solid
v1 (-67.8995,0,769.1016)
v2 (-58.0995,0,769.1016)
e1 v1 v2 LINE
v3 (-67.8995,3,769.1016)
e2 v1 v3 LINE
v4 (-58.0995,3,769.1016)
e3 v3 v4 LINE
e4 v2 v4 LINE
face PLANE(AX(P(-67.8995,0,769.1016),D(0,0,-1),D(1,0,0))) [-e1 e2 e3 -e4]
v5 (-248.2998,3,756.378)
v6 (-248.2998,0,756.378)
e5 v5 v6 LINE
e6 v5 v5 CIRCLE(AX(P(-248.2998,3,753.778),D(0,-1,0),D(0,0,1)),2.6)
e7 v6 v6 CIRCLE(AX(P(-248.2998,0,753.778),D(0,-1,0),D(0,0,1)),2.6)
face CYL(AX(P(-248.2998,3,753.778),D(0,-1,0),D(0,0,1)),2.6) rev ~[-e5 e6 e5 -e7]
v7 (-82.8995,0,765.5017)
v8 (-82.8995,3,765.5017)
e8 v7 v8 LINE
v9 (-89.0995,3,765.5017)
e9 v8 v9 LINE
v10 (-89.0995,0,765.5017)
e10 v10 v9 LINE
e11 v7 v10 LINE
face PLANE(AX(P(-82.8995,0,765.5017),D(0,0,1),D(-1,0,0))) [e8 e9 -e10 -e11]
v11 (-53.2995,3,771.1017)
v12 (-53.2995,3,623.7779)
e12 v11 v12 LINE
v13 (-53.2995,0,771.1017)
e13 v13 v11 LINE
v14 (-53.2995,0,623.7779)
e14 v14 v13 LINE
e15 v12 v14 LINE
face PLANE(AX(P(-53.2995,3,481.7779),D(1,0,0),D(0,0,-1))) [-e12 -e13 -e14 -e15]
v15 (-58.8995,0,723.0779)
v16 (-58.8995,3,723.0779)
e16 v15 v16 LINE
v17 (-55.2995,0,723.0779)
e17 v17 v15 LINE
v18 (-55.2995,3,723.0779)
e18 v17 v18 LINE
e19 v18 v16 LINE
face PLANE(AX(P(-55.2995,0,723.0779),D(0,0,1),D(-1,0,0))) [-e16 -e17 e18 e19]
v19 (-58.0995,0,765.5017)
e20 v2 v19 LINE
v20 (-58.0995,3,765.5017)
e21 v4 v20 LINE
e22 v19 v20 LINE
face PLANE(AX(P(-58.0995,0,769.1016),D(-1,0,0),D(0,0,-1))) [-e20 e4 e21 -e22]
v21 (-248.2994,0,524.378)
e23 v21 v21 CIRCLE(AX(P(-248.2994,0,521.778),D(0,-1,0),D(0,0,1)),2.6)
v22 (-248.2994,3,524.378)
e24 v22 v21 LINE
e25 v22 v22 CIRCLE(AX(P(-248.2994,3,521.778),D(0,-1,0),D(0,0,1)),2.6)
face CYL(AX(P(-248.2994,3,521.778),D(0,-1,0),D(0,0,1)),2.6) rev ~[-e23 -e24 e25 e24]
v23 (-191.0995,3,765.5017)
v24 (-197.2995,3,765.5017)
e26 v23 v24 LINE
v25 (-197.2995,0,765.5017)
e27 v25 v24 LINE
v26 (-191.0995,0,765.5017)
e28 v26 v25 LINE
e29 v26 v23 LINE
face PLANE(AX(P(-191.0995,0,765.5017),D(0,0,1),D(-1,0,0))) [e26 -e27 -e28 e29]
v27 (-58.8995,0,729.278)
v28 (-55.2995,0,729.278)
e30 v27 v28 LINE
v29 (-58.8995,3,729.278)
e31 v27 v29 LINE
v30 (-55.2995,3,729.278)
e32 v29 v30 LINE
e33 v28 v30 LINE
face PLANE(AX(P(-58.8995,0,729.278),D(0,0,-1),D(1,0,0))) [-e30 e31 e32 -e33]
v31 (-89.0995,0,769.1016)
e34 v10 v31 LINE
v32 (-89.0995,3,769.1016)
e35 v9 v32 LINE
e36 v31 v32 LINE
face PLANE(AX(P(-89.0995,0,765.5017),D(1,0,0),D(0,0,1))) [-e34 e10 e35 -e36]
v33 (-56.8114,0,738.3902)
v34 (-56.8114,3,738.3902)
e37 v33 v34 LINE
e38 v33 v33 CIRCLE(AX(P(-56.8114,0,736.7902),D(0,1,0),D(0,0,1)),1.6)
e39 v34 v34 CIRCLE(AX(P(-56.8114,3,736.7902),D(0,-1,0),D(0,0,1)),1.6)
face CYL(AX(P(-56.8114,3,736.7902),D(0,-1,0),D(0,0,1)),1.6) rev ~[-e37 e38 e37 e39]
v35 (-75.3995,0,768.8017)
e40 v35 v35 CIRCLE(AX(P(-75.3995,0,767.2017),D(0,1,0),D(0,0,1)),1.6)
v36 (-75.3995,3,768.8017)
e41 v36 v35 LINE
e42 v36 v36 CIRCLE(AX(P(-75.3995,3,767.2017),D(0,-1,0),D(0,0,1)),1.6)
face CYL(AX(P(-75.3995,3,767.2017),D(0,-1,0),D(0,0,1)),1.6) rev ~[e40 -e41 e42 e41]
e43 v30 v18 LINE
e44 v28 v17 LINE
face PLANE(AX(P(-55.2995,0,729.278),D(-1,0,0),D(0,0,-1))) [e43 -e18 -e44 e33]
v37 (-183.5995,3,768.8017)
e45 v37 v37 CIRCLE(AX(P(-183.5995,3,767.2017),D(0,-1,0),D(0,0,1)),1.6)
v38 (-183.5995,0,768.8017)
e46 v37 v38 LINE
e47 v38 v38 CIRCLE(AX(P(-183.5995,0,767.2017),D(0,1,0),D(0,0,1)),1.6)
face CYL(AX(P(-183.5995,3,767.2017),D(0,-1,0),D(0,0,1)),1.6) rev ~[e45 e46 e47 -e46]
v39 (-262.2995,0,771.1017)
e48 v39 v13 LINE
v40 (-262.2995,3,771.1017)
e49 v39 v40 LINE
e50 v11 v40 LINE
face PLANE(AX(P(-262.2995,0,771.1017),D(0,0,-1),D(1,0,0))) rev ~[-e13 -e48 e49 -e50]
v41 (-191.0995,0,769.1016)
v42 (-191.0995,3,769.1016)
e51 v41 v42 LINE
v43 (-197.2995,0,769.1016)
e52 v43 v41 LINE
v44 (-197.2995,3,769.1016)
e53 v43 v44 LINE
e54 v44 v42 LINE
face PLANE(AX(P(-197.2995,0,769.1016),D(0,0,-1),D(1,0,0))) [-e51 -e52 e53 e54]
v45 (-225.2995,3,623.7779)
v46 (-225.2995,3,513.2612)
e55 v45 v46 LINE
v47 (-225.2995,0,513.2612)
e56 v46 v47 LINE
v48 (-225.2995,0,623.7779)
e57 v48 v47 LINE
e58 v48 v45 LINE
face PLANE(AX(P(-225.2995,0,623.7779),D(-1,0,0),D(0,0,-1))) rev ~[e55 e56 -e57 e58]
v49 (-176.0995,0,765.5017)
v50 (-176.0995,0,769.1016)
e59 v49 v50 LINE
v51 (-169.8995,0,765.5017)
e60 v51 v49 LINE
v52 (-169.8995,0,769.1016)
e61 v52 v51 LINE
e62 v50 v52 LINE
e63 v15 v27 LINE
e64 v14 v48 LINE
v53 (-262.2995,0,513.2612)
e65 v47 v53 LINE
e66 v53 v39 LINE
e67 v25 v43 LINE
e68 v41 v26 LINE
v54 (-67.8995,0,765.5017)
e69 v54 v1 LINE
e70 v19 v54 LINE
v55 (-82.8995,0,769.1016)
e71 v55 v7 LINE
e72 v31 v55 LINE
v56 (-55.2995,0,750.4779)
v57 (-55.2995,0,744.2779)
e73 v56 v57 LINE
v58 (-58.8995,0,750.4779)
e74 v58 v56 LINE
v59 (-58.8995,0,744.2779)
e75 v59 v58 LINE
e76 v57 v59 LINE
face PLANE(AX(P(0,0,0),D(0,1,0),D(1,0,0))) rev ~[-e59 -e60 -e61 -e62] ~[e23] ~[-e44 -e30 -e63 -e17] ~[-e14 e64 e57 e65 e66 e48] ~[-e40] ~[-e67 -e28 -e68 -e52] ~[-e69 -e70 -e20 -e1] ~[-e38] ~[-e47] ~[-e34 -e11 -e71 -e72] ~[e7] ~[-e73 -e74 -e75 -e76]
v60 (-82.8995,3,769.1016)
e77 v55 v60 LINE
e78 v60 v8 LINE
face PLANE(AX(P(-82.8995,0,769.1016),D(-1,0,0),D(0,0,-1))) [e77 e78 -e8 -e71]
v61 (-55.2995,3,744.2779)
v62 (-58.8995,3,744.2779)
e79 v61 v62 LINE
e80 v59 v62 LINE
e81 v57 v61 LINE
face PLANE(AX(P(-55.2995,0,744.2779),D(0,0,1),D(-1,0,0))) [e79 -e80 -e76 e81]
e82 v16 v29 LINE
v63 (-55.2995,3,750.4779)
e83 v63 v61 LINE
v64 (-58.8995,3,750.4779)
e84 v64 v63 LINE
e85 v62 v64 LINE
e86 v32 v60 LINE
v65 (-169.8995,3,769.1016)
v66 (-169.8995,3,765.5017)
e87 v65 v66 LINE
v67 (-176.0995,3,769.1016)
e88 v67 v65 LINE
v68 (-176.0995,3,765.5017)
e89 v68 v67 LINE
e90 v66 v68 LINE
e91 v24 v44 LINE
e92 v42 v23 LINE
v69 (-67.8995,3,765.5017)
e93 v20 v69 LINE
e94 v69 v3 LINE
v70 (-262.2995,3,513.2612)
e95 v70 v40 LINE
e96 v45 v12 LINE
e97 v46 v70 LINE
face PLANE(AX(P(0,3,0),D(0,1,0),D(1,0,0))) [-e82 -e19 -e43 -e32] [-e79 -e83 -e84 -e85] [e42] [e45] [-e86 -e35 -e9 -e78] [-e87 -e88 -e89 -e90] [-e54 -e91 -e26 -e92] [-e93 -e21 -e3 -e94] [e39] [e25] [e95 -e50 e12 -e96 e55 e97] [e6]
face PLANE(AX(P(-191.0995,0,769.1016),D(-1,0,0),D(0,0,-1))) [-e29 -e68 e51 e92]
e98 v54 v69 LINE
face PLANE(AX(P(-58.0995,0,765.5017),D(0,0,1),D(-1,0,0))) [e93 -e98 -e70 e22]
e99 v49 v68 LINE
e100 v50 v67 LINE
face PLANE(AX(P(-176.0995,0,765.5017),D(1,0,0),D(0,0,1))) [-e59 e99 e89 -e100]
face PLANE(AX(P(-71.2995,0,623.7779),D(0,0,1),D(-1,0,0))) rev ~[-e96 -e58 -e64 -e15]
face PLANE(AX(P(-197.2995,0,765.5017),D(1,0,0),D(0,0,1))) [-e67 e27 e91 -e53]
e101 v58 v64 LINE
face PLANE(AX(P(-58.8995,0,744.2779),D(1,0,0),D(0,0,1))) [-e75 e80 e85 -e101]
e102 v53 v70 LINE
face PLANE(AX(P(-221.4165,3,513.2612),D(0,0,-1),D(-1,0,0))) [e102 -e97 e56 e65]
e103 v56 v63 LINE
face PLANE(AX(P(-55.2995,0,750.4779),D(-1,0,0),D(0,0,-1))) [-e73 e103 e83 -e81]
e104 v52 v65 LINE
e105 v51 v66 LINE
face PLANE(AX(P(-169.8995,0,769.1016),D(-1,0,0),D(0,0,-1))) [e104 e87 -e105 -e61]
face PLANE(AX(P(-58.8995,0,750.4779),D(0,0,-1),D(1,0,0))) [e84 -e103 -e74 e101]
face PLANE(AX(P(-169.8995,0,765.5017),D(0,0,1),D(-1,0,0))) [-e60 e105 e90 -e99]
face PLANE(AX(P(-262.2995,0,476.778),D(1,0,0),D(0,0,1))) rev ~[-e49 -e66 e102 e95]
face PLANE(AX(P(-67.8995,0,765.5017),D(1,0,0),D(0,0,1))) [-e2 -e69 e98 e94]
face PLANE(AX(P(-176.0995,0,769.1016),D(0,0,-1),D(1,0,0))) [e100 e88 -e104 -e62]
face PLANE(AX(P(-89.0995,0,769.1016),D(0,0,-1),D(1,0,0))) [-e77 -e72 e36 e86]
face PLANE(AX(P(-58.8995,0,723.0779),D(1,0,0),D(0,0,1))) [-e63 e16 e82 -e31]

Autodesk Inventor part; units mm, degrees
ref_plane "YZ Plane" through (0, 0, 0) normal (1, 0, 0) x (0, 1, 0)
ref_plane "XZ Plane" through (0, 0, 0) normal (0, 1, 0) x (-1, 0, 0)
ref_plane "XY Plane" through (0, 0, 0) normal (0, 0, 1) x (1, 0, 0)
sketch "Sketch1" plane through (0, 0, 0) normal (0, 1, 0) x (-1, 0, 0)
  line L0 (55.2995, 771.1017) -> (53.2995, 771.1017)
  line L1 (53.2995, 771.1017) -> (53.2995, 769.1016)
  line L2 (53.2995, 769.1016) -> (53.2995, 481.7779)
  line L3 (53.2995, 481.7779) -> (65.4836, 481.7779)
  line L4 (65.4836, 481.7779) -> (65.4836, 475.7779)
  line L5 (65.4836, 475.7779) -> (70.4836, 475.7779)
  line L6 (70.4836, 475.7779) -> (70.4836, 481.7779)
  line L7 (70.4836, 481.7779) -> (71.2995, 481.7779)
  line L8 (71.2995, 481.7779) -> (71.2995, 623.7779)
  line L9 (71.2995, 623.7779) -> (225.2995, 623.7779)
  line L10 (225.2995, 623.7779) -> (225.2995, 481.7779)
  line L11 (225.2995, 481.7779) -> (234.2995, 481.7779)
  line L12 (234.2995, 481.7779) -> (234.2995, 476.778)
  line L13 (234.2995, 476.778) -> (262.2995, 476.778)
  line L14 (262.2995, 476.778) -> (262.2995, 771.1017)
  line L15 (262.2995, 771.1017) -> (55.2995, 771.1017)
  line L16 (58.3449, 526.6921) -> (58.1851, 527.078)
  line L17 (58.1851, 527.078) -> (57.9308, 527.4094)
  line L18 (57.9308, 527.4094) -> (57.5994, 527.6636)
  line L19 (57.5994, 527.6636) -> (57.2135, 527.8234)
  line L20 (57.2135, 527.8234) -> (56.7994, 527.878)
  line L21 (56.7994, 527.878) -> (56.3853, 527.8234)
  line L22 (56.3853, 527.8234) -> (55.9994, 527.6636)
  line L23 (55.9994, 527.6636) -> (55.668, 527.4093)
  line L24 (55.668, 527.4093) -> (55.4138, 527.0779)
  line L25 (55.4138, 527.0779) -> (55.254, 526.692)
  line L26 (55.254, 526.692) -> (55.1994, 526.2779)
  line L27 (55.1994, 526.2779) -> (55.254, 525.8638)
  line L28 (55.254, 525.8638) -> (55.4138, 525.4779)
  line L29 (55.4138, 525.4779) -> (55.6681, 525.1465)
  line L30 (55.6681, 525.1465) -> (55.9994, 524.8923)
  line L31 (55.9994, 524.8923) -> (56.3853, 524.7325)
  line L32 (56.3853, 524.7325) -> (56.7992, 524.678)
  line L33 (56.7992, 524.678) -> (57.2135, 524.7325)
  line L34 (57.2135, 524.7325) -> (57.5994, 524.8924)
  line L35 (57.5994, 524.8924) -> (57.9308, 525.1466)
  line L36 (57.9308, 525.1466) -> (58.185, 525.478)
  line L37 (58.185, 525.478) -> (58.3449, 525.864)
  line L38 (58.3449, 525.864) -> (58.3994, 526.2781)
  line L39 (58.3994, 526.2781) -> (58.3449, 526.6921)
  line L40 (185.1711, 767.5014) -> (185.0472, 767.8829)
  line L41 (185.0472, 767.8829) -> (184.8323, 768.2215)
  line L42 (184.8323, 768.2215) -> (184.54, 768.496)
  line L43 (184.54, 768.496) -> (184.1885, 768.6893)
  line L44 (184.1885, 768.6893) -> (183.8, 768.7891)
  line L45 (183.8, 768.7891) -> (183.399, 768.7891)
  line L46 (183.399, 768.7891) -> (183.0105, 768.6893)
  line L47 (183.0105, 768.6893) -> (182.659, 768.4961)
  line L48 (182.659, 768.4961) -> (182.3667, 768.2216)
  line L49 (182.3667, 768.2216) -> (182.1518, 767.8829)
  line L50 (182.1518, 767.8829) -> (182.0278, 767.5015)
  line L51 (182.0278, 767.5015) -> (182.0026, 767.1012)
  line L52 (182.0026, 767.1012) -> (182.0778, 766.7072)
  line L53 (182.0778, 766.7072) -> (182.2485, 766.3443)
  line L54 (182.2485, 766.3443) -> (182.5042, 766.0353)
  line L55 (182.5042, 766.0353) -> (182.8287, 765.7996)
  line L56 (182.8287, 765.7996) -> (183.2016, 765.652)
  line L57 (183.2016, 765.652) -> (183.5994, 765.6017)
  line L58 (183.5994, 765.6017) -> (183.9974, 765.652)
  line L59 (183.9974, 765.652) -> (184.3703, 765.7996)
  line L60 (184.3703, 765.7996) -> (184.6947, 766.0353)
  line L61 (184.6947, 766.0353) -> (184.9504, 766.3444)
  line L62 (184.9504, 766.3444) -> (185.1212, 766.7072)
  line L63 (185.1212, 766.7072) -> (185.1963, 767.1012)
  line L64 (185.1963, 767.1012) -> (185.1711, 767.5014)
  line L65 (76.9712, 767.5015) -> (76.8472, 767.8829)
  line L66 (76.8472, 767.8829) -> (76.6323, 768.2216)
  line L67 (76.6323, 768.2216) -> (76.3399, 768.4961)
  line L68 (76.3399, 768.4961) -> (75.9885, 768.6893)
  line L69 (75.9885, 768.6893) -> (75.6, 768.7891)
  line L70 (75.6, 768.7891) -> (75.199, 768.7891)
  line L71 (75.199, 768.7891) -> (74.8105, 768.6893)
  line L72 (74.8105, 768.6893) -> (74.459, 768.4961)
  line L73 (74.459, 768.4961) -> (74.1667, 768.2216)
  line L74 (74.1667, 768.2216) -> (73.9518, 767.8829)
  line L75 (73.9518, 767.8829) -> (73.8278, 767.5015)
  line L76 (73.8278, 767.5015) -> (73.8027, 767.1012)
  line L77 (73.8027, 767.1012) -> (73.8778, 766.7072)
  line L78 (73.8778, 766.7072) -> (74.0486, 766.3444)
  line L79 (74.0486, 766.3444) -> (74.3042, 766.0353)
  line L80 (74.3042, 766.0353) -> (74.6287, 765.7996)
  line L81 (74.6287, 765.7996) -> (75.0016, 765.652)
  line L82 (75.0016, 765.652) -> (75.3995, 765.6017)
  line L83 (75.3995, 765.6017) -> (75.7974, 765.652)
  line L84 (75.7974, 765.652) -> (76.1703, 765.7996)
  line L85 (76.1703, 765.7996) -> (76.4947, 766.0353)
  line L86 (76.4947, 766.0353) -> (76.7504, 766.3444)
  line L87 (76.7504, 766.3444) -> (76.9212, 766.7072)
  line L88 (76.9212, 766.7072) -> (76.9964, 767.1012)
  line L89 (76.9964, 767.1012) -> (76.9712, 767.5015)
  line L90 (250.722, 522.4271) -> (250.4714, 523.032)
  line L91 (250.4714, 523.032) -> (250.0729, 523.5514)
  line L92 (250.0729, 523.5514) -> (249.5534, 523.9499)
  line L93 (249.5534, 523.9499) -> (248.9485, 524.2005)
  line L94 (248.9485, 524.2005) -> (248.2994, 524.286)
  line L95 (248.2994, 524.286) -> (247.6503, 524.2005)
  line L96 (247.6503, 524.2005) -> (247.0454, 523.95)
  line L97 (247.0454, 523.95) -> (246.526, 523.5514)
  line L98 (246.526, 523.5514) -> (246.1275, 523.0319)
  line L99 (246.1275, 523.0319) -> (245.8769, 522.4271)
  line L100 (245.8769, 522.4271) -> (245.7914, 521.778)
  line L101 (245.7914, 521.778) -> (245.8769, 521.1288)
  line L102 (245.8769, 521.1288) -> (246.1275, 520.524)
  line L103 (246.1275, 520.524) -> (246.526, 520.0045)
  line L104 (246.526, 520.0045) -> (247.0455, 519.606)
  line L105 (247.0455, 519.606) -> (247.6504, 519.3555)
  line L106 (247.6504, 519.3555) -> (248.2995, 519.27)
  line L107 (248.2995, 519.27) -> (248.9486, 519.3554)
  line L108 (248.9486, 519.3554) -> (249.5535, 519.606)
  line L109 (249.5535, 519.606) -> (250.0729, 520.0046)
  line L110 (250.0729, 520.0046) -> (250.4714, 520.524)
  line L111 (250.4714, 520.524) -> (250.722, 521.1289)
  line L112 (250.722, 521.1289) -> (250.8075, 521.7779)
  line L113 (250.8075, 521.7779) -> (250.722, 522.4271)
  line L114 (250.7224, 754.4272) -> (250.4718, 755.0321)
  line L115 (250.4718, 755.0321) -> (250.0733, 755.5515)
  line L116 (250.0733, 755.5515) -> (249.5538, 755.95)
  line L117 (249.5538, 755.95) -> (248.9489, 756.2005)
  line L118 (248.9489, 756.2005) -> (248.2998, 756.286)
  line L119 (248.2998, 756.286) -> (247.6507, 756.2006)
  line L120 (247.6507, 756.2006) -> (247.0458, 755.95)
  line L121 (247.0458, 755.95) -> (246.5264, 755.5515)
  line L122 (246.5264, 755.5515) -> (246.1279, 755.032)
  line L123 (246.1279, 755.032) -> (245.8773, 754.4271)
  line L124 (245.8773, 754.4271) -> (245.7918, 753.778)
  line L125 (245.7918, 753.778) -> (245.8773, 753.1288)
  line L126 (245.8773, 753.1288) -> (246.1279, 752.524)
  line L127 (246.1279, 752.524) -> (246.5264, 752.0045)
  line L128 (246.5264, 752.0045) -> (247.0459, 751.606)
  line L129 (247.0459, 751.606) -> (247.6508, 751.3555)
  line L130 (247.6508, 751.3555) -> (248.2999, 751.27)
  line L131 (248.2999, 751.27) -> (248.949, 751.3555)
  line L132 (248.949, 751.3555) -> (249.5539, 751.606)
  line L133 (249.5539, 751.606) -> (250.0737, 752.0049)
  line L134 (250.0737, 752.0049) -> (250.4719, 752.5239)
  line L135 (250.4719, 752.5239) -> (250.7224, 753.1288)
  line L136 (250.7224, 753.1288) -> (250.8079, 753.7777)
  line L137 (250.8079, 753.7777) -> (250.7224, 754.4272)
  line L138 (82.8995, 769.1016) -> (82.8995, 765.5017)
  line L139 (82.8995, 765.5017) -> (89.0995, 765.5017)
  line L140 (89.0995, 765.5017) -> (89.0995, 769.1016)
  line L141 (89.0995, 769.1016) -> (82.8995, 769.1016)
  line L142 (169.8995, 769.1016) -> (169.8995, 765.5017)
  line L143 (169.8995, 765.5017) -> (176.0995, 765.5017)
  line L144 (176.0995, 765.5017) -> (176.0995, 769.1016)
  line L145 (176.0995, 769.1016) -> (169.8995, 769.1016)
  line L146 (191.0995, 769.1016) -> (191.0995, 765.5017)
  line L147 (191.0995, 765.5017) -> (197.2995, 765.5017)
  line L148 (197.2995, 765.5017) -> (197.2995, 769.1016)
  line L149 (197.2995, 769.1016) -> (191.0995, 769.1016)
  line L150 (55.2995, 518.7672) -> (55.2995, 512.5672)
  line L151 (55.2995, 512.5672) -> (58.8995, 512.5672)
  line L152 (58.8995, 512.5672) -> (58.8995, 518.7672)
  line L153 (58.8995, 518.7672) -> (55.2995, 518.7672)
  line L154 (55.2995, 729.278) -> (55.2995, 723.0779)
  line L155 (55.2995, 723.0779) -> (58.8995, 723.0779)
  line L156 (58.8995, 723.0779) -> (58.8995, 729.278)
  line L157 (58.8995, 729.278) -> (55.2995, 729.278)
  line L158 (58.3568, 737.2044) -> (58.197, 737.5902)
  line L159 (58.197, 737.5902) -> (57.9428, 737.9216)
  line L160 (57.9428, 737.9216) -> (57.6114, 738.1758)
  line L161 (57.6114, 738.1758) -> (57.2255, 738.3357)
  line L162 (57.2255, 738.3357) -> (56.8114, 738.3902)
  line L163 (56.8114, 738.3902) -> (56.3972, 738.3357)
  line L164 (56.3972, 738.3357) -> (56.0113, 738.1758)
  line L165 (56.0113, 738.1758) -> (55.68, 737.9216)
  line L166 (55.68, 737.9216) -> (55.4258, 737.5902)
  line L167 (55.4258, 737.5902) -> (55.2659, 737.2043)
  line L168 (55.2659, 737.2043) -> (55.2114, 736.7902)
  line L169 (55.2114, 736.7902) -> (55.2659, 736.3761)
  line L170 (55.2659, 736.3761) -> (55.4257, 735.9902)
  line L171 (55.4257, 735.9902) -> (55.68, 735.6588)
  line L172 (55.68, 735.6588) -> (56.0114, 735.4046)
  line L173 (56.0114, 735.4046) -> (56.3973, 735.2448)
  line L174 (56.3973, 735.2448) -> (56.8114, 735.1902)
  line L175 (56.8114, 735.1902) -> (57.2255, 735.2447)
  line L176 (57.2255, 735.2447) -> (57.6114, 735.4046)
  line L177 (57.6114, 735.4046) -> (57.9427, 735.6588)
  line L178 (57.9427, 735.6588) -> (58.197, 735.9903)
  line L179 (58.197, 735.9903) -> (58.3568, 736.3762)
  line L180 (58.3568, 736.3762) -> (58.4114, 736.7902)
  line L181 (58.4114, 736.7902) -> (58.3568, 737.2044)
  line L182 (58.0995, 769.1016) -> (58.0995, 765.5017)
  line L183 (58.0995, 765.5017) -> (67.8995, 765.5017)
  line L184 (67.8995, 765.5017) -> (67.8995, 769.1016)
  line L185 (67.8995, 769.1016) -> (58.0995, 769.1016)
  line L186 (55.2995, 750.4779) -> (55.2995, 744.2779)
  line L187 (55.2995, 744.2779) -> (58.8995, 744.2779)
  line L188 (58.8995, 744.2779) -> (58.8995, 750.4779)
  line L189 (58.8995, 750.4779) -> (55.2995, 750.4779)
  line L190 (55.2995, 539.9672) -> (55.2995, 533.7672)
  line L191 (55.2995, 533.7672) -> (58.8995, 533.7672)
  line L192 (58.8995, 533.7672) -> (58.8995, 539.9672)
  line L193 (58.8995, 539.9672) -> (55.2995, 539.9672)
  point P0 (0, 0)
extrude "Extrusion1" add sketch "Sketch1" along normal blind 3
sketch "Sketch2" plane through (0, 3, 0) normal (0, 1, 0) x (1, 0, 0)
  line L0 (-58.0995, -769.1016) -> (-67.8995, -769.1016) projected
  line L1 (-67.8995, -769.1016) -> (-67.8995, -765.5017) projected
  line L2 (-67.8995, -765.5017) -> (-58.0995, -765.5017) projected
  line L3 (-58.0995, -765.5017) -> (-58.0995, -769.1016) projected
  line L4 (-55.2995, -729.278) -> (-58.8995, -729.278) projected
  line L5 (-58.8995, -729.278) -> (-58.8995, -723.0779) projected
  line L6 (-58.8995, -723.0779) -> (-55.2995, -723.0779) projected
  line L7 (-55.2995, -723.0779) -> (-55.2995, -729.278) projected
  line L8 (-55.2995, -518.7672) -> (-58.8995, -518.7672) projected
  line L9 (-58.8995, -518.7672) -> (-58.8995, -512.5672) projected
  line L10 (-58.8995, -512.5672) -> (-55.2995, -512.5672) projected
  line L11 (-55.2995, -512.5672) -> (-55.2995, -518.7672) projected
  line L12 (-191.0995, -769.1016) -> (-197.2995, -769.1016) projected
  line L13 (-197.2995, -769.1016) -> (-197.2995, -765.5017) projected
  line L14 (-197.2995, -765.5017) -> (-191.0995, -765.5017) projected
  line L15 (-191.0995, -765.5017) -> (-191.0995, -769.1016) projected
  line L16 (-55.2995, -539.9672) -> (-58.8995, -539.9672) projected
  line L17 (-58.8995, -539.9672) -> (-58.8995, -533.7672) projected
  line L18 (-58.8995, -533.7672) -> (-55.2995, -533.7672) projected
  line L19 (-55.2995, -533.7672) -> (-55.2995, -539.9672) projected
  line L20 (-55.2995, -750.4779) -> (-58.8995, -750.4779) projected
  line L21 (-58.8995, -750.4779) -> (-58.8995, -744.2779) projected
  line L22 (-58.8995, -744.2779) -> (-55.2995, -744.2779) projected
  line L23 (-55.2995, -744.2779) -> (-55.2995, -750.4779) projected
  line L24 (-169.8995, -769.1016) -> (-176.0995, -769.1016) projected
  line L25 (-176.0995, -769.1016) -> (-176.0995, -765.5017) projected
  line L26 (-176.0995, -765.5017) -> (-169.8995, -765.5017) projected
  line L27 (-169.8995, -765.5017) -> (-169.8995, -769.1016) projected
  line L28 (-82.8995, -769.1016) -> (-89.0995, -769.1016) projected
  line L29 (-89.0995, -769.1016) -> (-89.0995, -765.5017) projected
  line L30 (-89.0995, -765.5017) -> (-82.8995, -765.5017) projected
  line L31 (-82.8995, -765.5017) -> (-82.8995, -769.1016) projected
  line L32 (-250.7224, -754.4272) -> (-250.8079, -753.7777) projected
  line L33 (-250.8079, -753.7777) -> (-250.7224, -753.1288) projected
  line L34 (-250.7224, -753.1288) -> (-250.4719, -752.5239) projected
  line L35 (-250.4719, -752.5239) -> (-250.0737, -752.0049) projected
  line L36 (-250.0737, -752.0049) -> (-249.5539, -751.606) projected
  line L37 (-249.5539, -751.606) -> (-248.949, -751.3555) projected
  line L38 (-248.949, -751.3555) -> (-248.2999, -751.27) projected
  line L39 (-248.2999, -751.27) -> (-247.6508, -751.3555) projected
  line L40 (-247.6508, -751.3555) -> (-247.0459, -751.606) projected
  line L41 (-247.0459, -751.606) -> (-246.5264, -752.0045) projected
  line L42 (-246.5264, -752.0045) -> (-246.1279, -752.524) projected
  line L43 (-246.1279, -752.524) -> (-245.8773, -753.1288) projected
  line L44 (-245.8773, -753.1288) -> (-245.7918, -753.778) projected
  line L45 (-245.7918, -753.778) -> (-245.8773, -754.4271) projected
  line L46 (-245.8773, -754.4271) -> (-246.1279, -755.032) projected
  line L47 (-246.1279, -755.032) -> (-246.5264, -755.5515) projected
  line L48 (-246.5264, -755.5515) -> (-247.0458, -755.95) projected
  line L49 (-247.0458, -755.95) -> (-247.6507, -756.2006) projected
  line L50 (-247.6507, -756.2006) -> (-248.2998, -756.286) projected
  line L51 (-248.2998, -756.286) -> (-248.9489, -756.2005) projected
  line L52 (-248.9489, -756.2005) -> (-249.5538, -755.95) projected
  line L53 (-249.5538, -755.95) -> (-250.0733, -755.5515) projected
  line L54 (-250.0733, -755.5515) -> (-250.4718, -755.0321) projected
  line L55 (-250.4718, -755.0321) -> (-250.7224, -754.4272) projected
  line L56 (-250.722, -522.4271) -> (-250.8075, -521.7779) projected
  line L57 (-250.8075, -521.7779) -> (-250.722, -521.1289) projected
  line L58 (-250.722, -521.1289) -> (-250.4714, -520.524) projected
  line L59 (-250.4714, -520.524) -> (-250.0729, -520.0046) projected
  line L60 (-250.0729, -520.0046) -> (-249.5535, -519.606) projected
  line L61 (-249.5535, -519.606) -> (-248.9486, -519.3554) projected
  line L62 (-248.9486, -519.3554) -> (-248.2995, -519.27) projected
  line L63 (-248.2995, -519.27) -> (-247.6504, -519.3555) projected
  line L64 (-247.6504, -519.3555) -> (-247.0455, -519.606) projected
  line L65 (-247.0455, -519.606) -> (-246.526, -520.0045) projected
  line L66 (-246.526, -520.0045) -> (-246.1275, -520.524) projected
  line L67 (-246.1275, -520.524) -> (-245.8769, -521.1288) projected
  line L68 (-245.8769, -521.1288) -> (-245.7914, -521.778) projected
  line L69 (-245.7914, -521.778) -> (-245.8769, -522.4271) projected
  line L70 (-245.8769, -522.4271) -> (-246.1275, -523.0319) projected
  line L71 (-246.1275, -523.0319) -> (-246.526, -523.5514) projected
  line L72 (-246.526, -523.5514) -> (-247.0454, -523.95) projected
  line L73 (-247.0454, -523.95) -> (-247.6503, -524.2005) projected
  line L74 (-247.6503, -524.2005) -> (-248.2994, -524.286) projected
  line L75 (-248.2994, -524.286) -> (-248.9485, -524.2005) projected
  line L76 (-248.9485, -524.2005) -> (-249.5534, -523.9499) projected
  line L77 (-249.5534, -523.9499) -> (-250.0729, -523.5514) projected
  line L78 (-250.0729, -523.5514) -> (-250.4714, -523.032) projected
  line L79 (-250.4714, -523.032) -> (-250.722, -522.4271) projected
  line L80 (-76.9712, -767.5015) -> (-76.9964, -767.1012) projected
  line L81 (-76.9964, -767.1012) -> (-76.9212, -766.7072) projected
  line L82 (-76.9212, -766.7072) -> (-76.7504, -766.3444) projected
  line L83 (-76.7504, -766.3444) -> (-76.4947, -766.0353) projected
  line L84 (-76.4947, -766.0353) -> (-76.1703, -765.7996) projected
  line L85 (-76.1703, -765.7996) -> (-75.7974, -765.652) projected
  line L86 (-75.7974, -765.652) -> (-75.3995, -765.6017) projected
  line L87 (-75.3995, -765.6017) -> (-75.0016, -765.652) projected
  line L88 (-75.0016, -765.652) -> (-74.6287, -765.7996) projected
  line L89 (-74.6287, -765.7996) -> (-74.3042, -766.0353) projected
  line L90 (-74.3042, -766.0353) -> (-74.0486, -766.3444) projected
  line L91 (-74.0486, -766.3444) -> (-73.8778, -766.7072) projected
  line L92 (-73.8778, -766.7072) -> (-73.8027, -767.1012) projected
  line L93 (-73.8027, -767.1012) -> (-73.8278, -767.5015) projected
  line L94 (-73.8278, -767.5015) -> (-73.9518, -767.8829) projected
  line L95 (-73.9518, -767.8829) -> (-74.1667, -768.2216) projected
  line L96 (-74.1667, -768.2216) -> (-74.459, -768.4961) projected
  line L97 (-74.459, -768.4961) -> (-74.8105, -768.6893) projected
  line L98 (-74.8105, -768.6893) -> (-75.199, -768.7891) projected
  line L99 (-75.199, -768.7891) -> (-75.6, -768.7891) projected
  line L100 (-75.6, -768.7891) -> (-75.9885, -768.6893) projected
  line L101 (-75.9885, -768.6893) -> (-76.3399, -768.4961) projected
  line L102 (-76.3399, -768.4961) -> (-76.6323, -768.2216) projected
  line L103 (-76.6323, -768.2216) -> (-76.8472, -767.8829) projected
  line L104 (-76.8472, -767.8829) -> (-76.9712, -767.5015) projected
  line L105 (-185.1711, -767.5014) -> (-185.1963, -767.1012) projected
  line L106 (-185.1963, -767.1012) -> (-185.1212, -766.7072) projected
  line L107 (-185.1212, -766.7072) -> (-184.9504, -766.3444) projected
  line L108 (-184.9504, -766.3444) -> (-184.6947, -766.0353) projected
  line L109 (-184.6947, -766.0353) -> (-184.3703, -765.7996) projected
  line L110 (-184.3703, -765.7996) -> (-183.9974, -765.652) projected
  line L111 (-183.9974, -765.652) -> (-183.5994, -765.6017) projected
  line L112 (-183.5994, -765.6017) -> (-183.2016, -765.652) projected
  line L113 (-183.2016, -765.652) -> (-182.8287, -765.7996) projected
  line L114 (-182.8287, -765.7996) -> (-182.5042, -766.0353) projected
  line L115 (-182.5042, -766.0353) -> (-182.2485, -766.3443) projected
  line L116 (-182.2485, -766.3443) -> (-182.0778, -766.7072) projected
  line L117 (-182.0778, -766.7072) -> (-182.0026, -767.1012) projected
  line L118 (-182.0026, -767.1012) -> (-182.0278, -767.5015) projected
  line L119 (-182.0278, -767.5015) -> (-182.1518, -767.8829) projected
  line L120 (-182.1518, -767.8829) -> (-182.3667, -768.2216) projected
  line L121 (-182.3667, -768.2216) -> (-182.659, -768.4961) projected
  line L122 (-182.659, -768.4961) -> (-183.0105, -768.6893) projected
  line L123 (-183.0105, -768.6893) -> (-183.399, -768.7891) projected
  line L124 (-183.399, -768.7891) -> (-183.8, -768.7891) projected
  line L125 (-183.8, -768.7891) -> (-184.1885, -768.6893) projected
  line L126 (-184.1885, -768.6893) -> (-184.54, -768.496) projected
  line L127 (-184.54, -768.496) -> (-184.8323, -768.2215) projected
  line L128 (-184.8323, -768.2215) -> (-185.0472, -767.8829) projected
  line L129 (-185.0472, -767.8829) -> (-185.1711, -767.5014) projected
  line L130 (-58.3568, -737.2044) -> (-58.4114, -736.7902) projected
  line L131 (-58.4114, -736.7902) -> (-58.3568, -736.3762) projected
  line L132 (-58.3568, -736.3762) -> (-58.197, -735.9903) projected
  line L133 (-58.197, -735.9903) -> (-57.9427, -735.6588) projected
  line L134 (-57.9427, -735.6588) -> (-57.6114, -735.4046) projected
  line L135 (-57.6114, -735.4046) -> (-57.2255, -735.2447) projected
  line L136 (-57.2255, -735.2447) -> (-56.8114, -735.1902) projected
  line L137 (-56.8114, -735.1902) -> (-56.3973, -735.2448) projected
  line L138 (-56.3973, -735.2448) -> (-56.0114, -735.4046) projected
  line L139 (-56.0114, -735.4046) -> (-55.68, -735.6588) projected
  line L140 (-55.68, -735.6588) -> (-55.4257, -735.9902) projected
  line L141 (-55.4257, -735.9902) -> (-55.2659, -736.3761) projected
  line L142 (-55.2659, -736.3761) -> (-55.2114, -736.7902) projected
  line L143 (-55.2114, -736.7902) -> (-55.2659, -737.2043) projected
  line L144 (-55.2659, -737.2043) -> (-55.4258, -737.5902) projected
  line L145 (-55.4258, -737.5902) -> (-55.68, -737.9216) projected
  line L146 (-55.68, -737.9216) -> (-56.0113, -738.1758) projected
  line L147 (-56.0113, -738.1758) -> (-56.3972, -738.3357) projected
  line L148 (-56.3972, -738.3357) -> (-56.8114, -738.3902) projected
  line L149 (-56.8114, -738.3902) -> (-57.2255, -738.3357) projected
  line L150 (-57.2255, -738.3357) -> (-57.6114, -738.1758) projected
  line L151 (-57.6114, -738.1758) -> (-57.9428, -737.9216) projected
  line L152 (-57.9428, -737.9216) -> (-58.197, -737.5902) projected
  line L153 (-58.197, -737.5902) -> (-58.3568, -737.2044) projected
  line L154 (-58.3449, -526.6921) -> (-58.3994, -526.2781) projected
  line L155 (-58.3994, -526.2781) -> (-58.3449, -525.864) projected
  line L156 (-58.3449, -525.864) -> (-58.185, -525.478) projected
  line L157 (-58.185, -525.478) -> (-57.9308, -525.1466) projected
  line L158 (-57.9308, -525.1466) -> (-57.5994, -524.8924) projected
  line L159 (-57.5994, -524.8924) -> (-57.2135, -524.7325) projected
  line L160 (-57.2135, -524.7325) -> (-56.7992, -524.678) projected
  line L161 (-56.7992, -524.678) -> (-56.3853, -524.7325) projected
  line L162 (-56.3853, -524.7325) -> (-55.9994, -524.8923) projected
  line L163 (-55.9994, -524.8923) -> (-55.6681, -525.1465) projected
  line L164 (-55.6681, -525.1465) -> (-55.4138, -525.4779) projected
  line L165 (-55.4138, -525.4779) -> (-55.254, -525.8638) projected
  line L166 (-55.254, -525.8638) -> (-55.1994, -526.2779) projected
  line L167 (-55.1994, -526.2779) -> (-55.254, -526.692) projected
  line L168 (-55.254, -526.692) -> (-55.4138, -527.0779) projected
  line L169 (-55.4138, -527.0779) -> (-55.668, -527.4093) projected
  line L170 (-55.668, -527.4093) -> (-55.9994, -527.6636) projected
  line L171 (-55.9994, -527.6636) -> (-56.3853, -527.8234) projected
  line L172 (-56.3853, -527.8234) -> (-56.7994, -527.878) projected
  line L173 (-56.7994, -527.878) -> (-57.2135, -527.8234) projected
  line L174 (-57.2135, -527.8234) -> (-57.5994, -527.6636) projected
  line L175 (-57.5994, -527.6636) -> (-57.9308, -527.4094) projected
  line L176 (-57.9308, -527.4094) -> (-58.1851, -527.078) projected
  line L177 (-58.1851, -527.078) -> (-58.3449, -526.6921) projected
  line L178 (-262.2995, -771.1017) -> (-53.2995, -771.1017) projected
  line L179 (-53.2995, -771.1017) -> (-53.2995, -481.7779) projected
  line L180 (-53.2995, -481.7779) -> (-65.4836, -481.7779) projected
  line L181 (-65.4836, -481.7779) -> (-65.4836, -475.7779) projected
  line L182 (-65.4836, -475.7779) -> (-70.4836, -475.7779) projected
  line L183 (-70.4836, -475.7779) -> (-70.4836, -481.7779) projected
  line L184 (-70.4836, -481.7779) -> (-71.2995, -481.7779) projected
  line L185 (-71.2995, -481.7779) -> (-71.2995, -623.7779) projected
  line L186 (-71.2995, -623.7779) -> (-225.2995, -623.7779) projected
  line L187 (-225.2995, -623.7779) -> (-225.2995, -481.7779) projected
  line L188 (-225.2995, -481.7779) -> (-234.2995, -481.7779) projected
  line L189 (-234.2995, -481.7779) -> (-234.2995, -476.778) projected
  line L190 (-234.2995, -476.778) -> (-262.2995, -476.778) projected
  line L191 (-262.2995, -476.778) -> (-262.2995, -771.1017) projected
  circle A0 centre (-75.3995, -767.2017) radius 1.5874
  circle A1 centre (-183.5995, -767.2017) radius 1.5874
  circle A2 centre (-56.8114, -736.7902) radius 1.5863
  circle A3 centre (-56.7995, -526.278) radius 1.5862
  point P0 (0, 0)
hole "Hole1" at (-56.7995, 3, 526.278) at (-56.8114, 3, 736.7902) at (-75.3995, 3, 767.2017) at (-183.5995, 3, 767.2017) direction (0, -1, 0) diameter 3.2 end through all
sketch "Sketch5" plane through (0, 3, 0) normal (0, 1, 0) x (1, 0, 0)
  line L0 (-247.6507, -756.2006) -> (-247.0458, -755.95) projected
  line L1 (-250.0733, -755.5515) -> (-249.5538, -755.95) projected
  line L2 (-248.949, -751.3555) -> (-248.2999, -751.27) projected
  line L3 (-248.9486, -519.3554) -> (-248.2995, -519.27) projected
  line L4 (-249.5534, -523.9499) -> (-250.0729, -523.5514) projected
  line L5 (-246.526, -523.5514) -> (-247.0454, -523.95) projected
  circle A0 centre (-248.2998, -753.778) radius 2.4866
  circle A1 centre (-248.2994, -521.778) radius 2.4866
  point P0 (0, 0)
hole "Hole2" at (-248.2998, 3, 753.778) at (-248.2994, 3, 521.778) direction (0, -1, 0) diameter 5.2 end through all
sketch "Sketch6" plane through (0, 3, 0) normal (0, 1, 0) x (1, 0, 0)
  line L0 (-71.2995, -481.7779) -> (-71.2995, -623.7779) projected
  line L1 (-71.2995, -481.7779) -> (-53.2995, -481.7779)
  line L2 (-53.2995, -481.7779) -> (-53.2995, -455.7908)
  line L3 (-53.2995, -455.7908) -> (-71.2995, -455.7908)
  line L4 (-71.2995, -455.7908) -> (-71.2995, -481.7779)
  point P0 (0, 0)
extrude "Extrusion2" add sketch "Sketch6" against normal blind 3
sketch "Sketch7" plane through (0, 3, 0) normal (0, 1, 0) x (1, 0, 0)
  circle A0 centre (-62.3818, -460.5756) radius 2.6
  point P0 (0, 0)
  point P1 (-187.2996, -460.5756)
  dimension "d18" = 5.2
extrude "Extrusion3" cut sketch "Sketch7" against normal through all
sketch "Sketch8" plane through (0, 3, 0) normal (0, 1, 0) x (1, 0, 0)
  line L0 (-221.4165, -513.2612) -> (-270.0696, -513.2612)
  line L1 (-270.0696, -513.2612) -> (-270.0696, -464.0531)
  line L2 (-270.0696, -464.0531) -> (-221.4165, -464.0531)
  line L3 (-221.4165, -464.0531) -> (-221.4165, -513.2612)
  point P0 (0, 0)
  point P1 (-236.6995, -510.7779)
extrude "Extrusion4" cut sketch "Sketch8" against normal blind 3
sketch "Sketch9" plane through (0, 3, 0) normal (0, 1, 0) x (1, 0, 0)
  line L0 (-71.2995, -623.7779) -> (-25.9421, -623.7779)
  line L1 (-25.9421, -623.7779) -> (-25.9421, -372.5945)
  line L2 (-25.9421, -372.5945) -> (-71.2995, -372.5945)
  line L3 (-71.2995, -372.5945) -> (-71.2995, -623.7779)
  point P0 (0, 0)
extrude "Extrusion5" cut sketch "Sketch9" against normal through all
properties part number "EE PSU TOP" material "Polycarbonate, Green"
